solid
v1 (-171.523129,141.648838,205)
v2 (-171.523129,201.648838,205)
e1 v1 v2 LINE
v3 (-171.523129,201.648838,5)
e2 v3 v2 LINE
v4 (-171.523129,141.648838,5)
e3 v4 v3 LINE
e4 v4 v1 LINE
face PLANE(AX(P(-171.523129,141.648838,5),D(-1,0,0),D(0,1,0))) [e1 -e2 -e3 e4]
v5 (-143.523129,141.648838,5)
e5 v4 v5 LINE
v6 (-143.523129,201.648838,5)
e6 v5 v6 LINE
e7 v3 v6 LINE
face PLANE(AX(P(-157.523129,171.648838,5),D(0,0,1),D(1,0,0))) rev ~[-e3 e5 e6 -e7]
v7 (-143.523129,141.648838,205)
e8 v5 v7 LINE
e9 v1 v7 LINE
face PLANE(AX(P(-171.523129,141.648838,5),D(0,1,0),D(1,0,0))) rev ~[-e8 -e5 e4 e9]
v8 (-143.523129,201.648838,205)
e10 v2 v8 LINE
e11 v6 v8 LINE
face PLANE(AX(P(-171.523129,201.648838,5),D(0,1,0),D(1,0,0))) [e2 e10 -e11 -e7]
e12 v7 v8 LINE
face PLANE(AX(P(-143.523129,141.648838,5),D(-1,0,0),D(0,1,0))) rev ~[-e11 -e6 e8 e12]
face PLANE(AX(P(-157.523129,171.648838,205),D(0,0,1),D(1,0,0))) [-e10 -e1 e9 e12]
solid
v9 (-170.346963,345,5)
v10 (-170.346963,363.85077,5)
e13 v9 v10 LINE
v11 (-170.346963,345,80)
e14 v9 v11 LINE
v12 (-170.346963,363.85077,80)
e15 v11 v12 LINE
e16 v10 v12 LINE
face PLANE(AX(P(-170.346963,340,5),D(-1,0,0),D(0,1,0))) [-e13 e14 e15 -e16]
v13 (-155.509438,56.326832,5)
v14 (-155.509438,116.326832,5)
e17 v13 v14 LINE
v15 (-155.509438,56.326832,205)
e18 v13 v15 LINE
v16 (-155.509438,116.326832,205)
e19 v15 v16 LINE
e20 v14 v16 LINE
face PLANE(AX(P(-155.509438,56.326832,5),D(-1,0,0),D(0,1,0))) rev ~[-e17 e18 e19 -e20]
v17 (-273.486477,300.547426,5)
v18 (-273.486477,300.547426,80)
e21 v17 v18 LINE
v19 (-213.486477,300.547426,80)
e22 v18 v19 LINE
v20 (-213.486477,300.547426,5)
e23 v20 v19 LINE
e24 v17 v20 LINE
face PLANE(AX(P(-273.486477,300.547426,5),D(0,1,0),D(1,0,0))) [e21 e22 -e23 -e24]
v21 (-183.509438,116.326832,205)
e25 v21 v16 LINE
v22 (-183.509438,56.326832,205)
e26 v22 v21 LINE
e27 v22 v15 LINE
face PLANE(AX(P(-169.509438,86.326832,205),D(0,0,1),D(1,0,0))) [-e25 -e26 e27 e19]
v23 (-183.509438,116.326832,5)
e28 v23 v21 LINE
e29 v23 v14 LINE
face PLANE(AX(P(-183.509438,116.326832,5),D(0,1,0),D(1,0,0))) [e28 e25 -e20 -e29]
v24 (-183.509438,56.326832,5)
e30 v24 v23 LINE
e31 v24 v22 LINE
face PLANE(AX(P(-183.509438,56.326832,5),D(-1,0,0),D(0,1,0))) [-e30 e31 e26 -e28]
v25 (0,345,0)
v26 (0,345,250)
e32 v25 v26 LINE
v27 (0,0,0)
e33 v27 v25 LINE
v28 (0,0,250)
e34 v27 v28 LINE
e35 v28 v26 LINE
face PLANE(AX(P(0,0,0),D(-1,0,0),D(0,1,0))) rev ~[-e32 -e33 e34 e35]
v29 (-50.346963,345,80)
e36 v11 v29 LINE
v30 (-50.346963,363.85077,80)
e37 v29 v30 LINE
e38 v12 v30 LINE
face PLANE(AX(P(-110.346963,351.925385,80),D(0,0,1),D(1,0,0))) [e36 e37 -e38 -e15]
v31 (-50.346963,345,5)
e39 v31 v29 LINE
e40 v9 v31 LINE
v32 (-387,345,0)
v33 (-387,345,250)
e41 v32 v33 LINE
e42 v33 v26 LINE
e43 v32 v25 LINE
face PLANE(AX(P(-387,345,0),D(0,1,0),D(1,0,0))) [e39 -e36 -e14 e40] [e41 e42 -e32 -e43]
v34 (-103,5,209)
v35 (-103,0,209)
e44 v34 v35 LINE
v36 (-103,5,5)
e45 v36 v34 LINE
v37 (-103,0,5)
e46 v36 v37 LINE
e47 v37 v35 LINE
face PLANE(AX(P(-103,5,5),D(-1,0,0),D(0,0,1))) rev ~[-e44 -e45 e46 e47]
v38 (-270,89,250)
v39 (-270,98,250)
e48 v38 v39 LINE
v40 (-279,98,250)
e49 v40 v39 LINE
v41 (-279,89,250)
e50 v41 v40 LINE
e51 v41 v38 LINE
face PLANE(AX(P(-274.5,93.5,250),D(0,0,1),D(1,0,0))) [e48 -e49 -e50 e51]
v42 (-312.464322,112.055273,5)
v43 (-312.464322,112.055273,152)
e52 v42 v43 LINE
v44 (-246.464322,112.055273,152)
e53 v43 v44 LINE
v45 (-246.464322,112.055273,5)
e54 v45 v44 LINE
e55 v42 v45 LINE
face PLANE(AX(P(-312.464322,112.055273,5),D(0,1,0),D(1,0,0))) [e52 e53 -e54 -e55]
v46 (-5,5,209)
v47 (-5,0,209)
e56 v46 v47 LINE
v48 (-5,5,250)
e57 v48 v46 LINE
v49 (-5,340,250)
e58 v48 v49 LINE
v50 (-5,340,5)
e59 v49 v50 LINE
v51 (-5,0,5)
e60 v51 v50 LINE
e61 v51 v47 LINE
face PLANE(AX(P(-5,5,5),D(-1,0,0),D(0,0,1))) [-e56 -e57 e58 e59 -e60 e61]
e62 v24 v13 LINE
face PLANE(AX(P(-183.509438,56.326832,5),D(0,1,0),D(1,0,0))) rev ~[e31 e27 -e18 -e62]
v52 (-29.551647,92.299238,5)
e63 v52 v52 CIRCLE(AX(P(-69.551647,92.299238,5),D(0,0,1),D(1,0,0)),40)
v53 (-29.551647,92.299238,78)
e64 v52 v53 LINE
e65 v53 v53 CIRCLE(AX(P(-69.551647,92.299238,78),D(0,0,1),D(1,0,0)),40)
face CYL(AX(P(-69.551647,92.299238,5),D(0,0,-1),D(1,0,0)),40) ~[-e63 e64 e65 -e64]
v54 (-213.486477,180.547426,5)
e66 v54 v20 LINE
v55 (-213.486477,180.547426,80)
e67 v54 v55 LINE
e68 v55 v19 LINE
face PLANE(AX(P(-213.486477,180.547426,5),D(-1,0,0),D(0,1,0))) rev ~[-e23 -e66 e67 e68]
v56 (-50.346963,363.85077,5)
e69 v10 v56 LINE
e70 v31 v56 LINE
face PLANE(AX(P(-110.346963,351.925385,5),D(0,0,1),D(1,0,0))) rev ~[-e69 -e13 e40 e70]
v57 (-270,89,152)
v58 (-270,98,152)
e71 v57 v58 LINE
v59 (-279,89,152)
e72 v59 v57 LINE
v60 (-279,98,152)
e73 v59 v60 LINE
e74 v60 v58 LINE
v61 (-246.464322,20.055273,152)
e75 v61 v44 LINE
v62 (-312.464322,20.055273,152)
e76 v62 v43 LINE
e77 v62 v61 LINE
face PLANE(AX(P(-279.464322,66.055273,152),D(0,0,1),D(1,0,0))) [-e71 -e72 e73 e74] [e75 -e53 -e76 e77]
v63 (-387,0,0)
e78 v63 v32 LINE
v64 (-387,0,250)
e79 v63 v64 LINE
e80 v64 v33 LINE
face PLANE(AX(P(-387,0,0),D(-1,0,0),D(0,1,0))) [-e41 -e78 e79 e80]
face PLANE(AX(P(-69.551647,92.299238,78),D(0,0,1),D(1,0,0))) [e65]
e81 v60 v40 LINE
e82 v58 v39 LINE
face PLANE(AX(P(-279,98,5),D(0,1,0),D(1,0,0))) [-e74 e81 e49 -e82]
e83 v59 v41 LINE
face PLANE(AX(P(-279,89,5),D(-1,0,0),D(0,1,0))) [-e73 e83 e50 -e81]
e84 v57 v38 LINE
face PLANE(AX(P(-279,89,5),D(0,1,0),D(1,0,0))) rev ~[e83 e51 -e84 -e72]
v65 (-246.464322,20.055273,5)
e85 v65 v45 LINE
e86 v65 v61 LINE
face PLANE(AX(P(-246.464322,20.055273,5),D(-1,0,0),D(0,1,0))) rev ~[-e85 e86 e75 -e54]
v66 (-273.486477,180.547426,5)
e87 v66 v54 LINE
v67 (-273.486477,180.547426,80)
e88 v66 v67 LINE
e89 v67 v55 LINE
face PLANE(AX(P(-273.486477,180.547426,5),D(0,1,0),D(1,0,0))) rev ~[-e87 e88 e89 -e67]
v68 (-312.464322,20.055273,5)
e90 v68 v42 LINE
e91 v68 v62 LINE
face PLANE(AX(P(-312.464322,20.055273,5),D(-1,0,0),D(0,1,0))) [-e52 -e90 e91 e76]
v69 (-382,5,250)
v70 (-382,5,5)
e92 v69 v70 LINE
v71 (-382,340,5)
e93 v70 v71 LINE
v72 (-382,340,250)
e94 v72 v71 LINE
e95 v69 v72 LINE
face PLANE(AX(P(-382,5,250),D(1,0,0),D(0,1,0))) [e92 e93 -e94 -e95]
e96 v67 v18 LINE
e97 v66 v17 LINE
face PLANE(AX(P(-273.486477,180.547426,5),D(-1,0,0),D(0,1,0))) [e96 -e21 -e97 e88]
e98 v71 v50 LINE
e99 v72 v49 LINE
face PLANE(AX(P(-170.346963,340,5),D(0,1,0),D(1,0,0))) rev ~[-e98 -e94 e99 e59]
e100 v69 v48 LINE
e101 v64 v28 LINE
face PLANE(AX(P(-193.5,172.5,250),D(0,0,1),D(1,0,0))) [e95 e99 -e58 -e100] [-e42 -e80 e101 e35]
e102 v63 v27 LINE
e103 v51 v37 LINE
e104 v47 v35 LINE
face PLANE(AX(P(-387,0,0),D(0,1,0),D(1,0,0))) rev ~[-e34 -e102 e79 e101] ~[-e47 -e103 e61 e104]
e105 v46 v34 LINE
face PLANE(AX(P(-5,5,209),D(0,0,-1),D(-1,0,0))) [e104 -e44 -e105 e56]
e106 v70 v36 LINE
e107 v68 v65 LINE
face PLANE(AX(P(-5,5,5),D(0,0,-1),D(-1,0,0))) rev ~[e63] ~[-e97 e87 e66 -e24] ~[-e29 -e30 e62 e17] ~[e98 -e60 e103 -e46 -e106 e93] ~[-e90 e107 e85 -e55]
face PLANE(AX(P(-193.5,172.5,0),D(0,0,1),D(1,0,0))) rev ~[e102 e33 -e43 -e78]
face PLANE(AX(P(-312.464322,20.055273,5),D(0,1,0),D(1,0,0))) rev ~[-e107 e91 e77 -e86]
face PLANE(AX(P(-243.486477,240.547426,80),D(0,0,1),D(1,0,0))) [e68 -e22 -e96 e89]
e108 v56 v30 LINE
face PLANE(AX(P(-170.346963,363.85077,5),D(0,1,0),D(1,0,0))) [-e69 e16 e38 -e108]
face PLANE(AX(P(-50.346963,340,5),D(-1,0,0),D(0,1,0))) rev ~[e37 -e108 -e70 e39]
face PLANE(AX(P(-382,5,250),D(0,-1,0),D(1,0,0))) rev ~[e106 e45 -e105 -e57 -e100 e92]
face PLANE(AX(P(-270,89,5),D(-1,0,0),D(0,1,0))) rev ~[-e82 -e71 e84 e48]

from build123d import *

# Parameters (mm, degrees)
F0_W      = 387
F0_H      = 345
F1_DEPTH  = 250
F2_W      = 377
F2_H      = 335
F3_DEPTH  = 245
F4_W      = 98
F4_H      = 204
F5_DEPTH  = 25
F6_W      = 9
F6_H      = 9
F7_DEPTH  = 245
F8_W      = 60
F8_H      = 120
F9_DEPTH  = 75
F10_W     = 120
F10_H     = 23.8507700859
F11_DEPTH = 75
F12_W     = 28
F12_H     = 60
F13_DEPTH = 200
F14_W     = 28
F14_H     = 60
F15_DEPTH = 200
F16_R     = 40
F17_DEPTH = 73
F18_W     = 66
F18_H     = 92
F18_W_2   = 9
F18_H_2   = 9
F19_DEPTH = 147


with BuildPart() as f1:
    # F0 (on Top) → F1 (new body)
    with BuildSketch(Plane.XY):
        with Locations((-193.5, 172.5)):
            Rectangle(F0_W, F0_H)
    extrude(amount=F1_DEPTH)

    # F2 (on face) → F3 (cut)
    with BuildSketch(Plane.XY.offset(250)):
        with Locations((-193.5, 172.5)):
            Rectangle(F2_W, F2_H)
    extrude(amount=-F3_DEPTH, mode=Mode.SUBTRACT)

    # F4 (on face) → F5 (cut)
    with BuildSketch(Plane(origin=(0, 5, 0), x_dir=(-1, 0, 0), z_dir=(0, 1, 0))):
        with Locations((54, 107)):
            Rectangle(F4_W, F4_H)
    extrude(amount=-F5_DEPTH, mode=Mode.SUBTRACT)

    # F6 (on face) → F7 (join)
    with BuildSketch(Plane.XY.offset(5)):
        with Locations((-274.5, 93.5)):
            Rectangle(F6_W, F6_H)
    extrude(amount=F7_DEPTH)

    # F8 (on face) → F9 (join)
    with BuildSketch(Plane.XY.offset(5)):
        with Locations((-243.4864774462, 240.5474260449)):
            Rectangle(F8_W, F8_H)
    extrude(amount=F9_DEPTH)

    # F10 (on face) → F11 (join)
    with BuildSketch(Plane.XY.offset(5)):
        with Locations((-110.3469633506, 351.925385043)):
            Rectangle(F10_W, F10_H)
    extrude(amount=F11_DEPTH)

    # F14 (on face) → F15 (join)
    with BuildSketch(Plane.XY.offset(5)):
        with Locations((-169.5094383758, 86.3268319517)):
            Rectangle(F14_W, F14_H)
    extrude(amount=F15_DEPTH)

    # F16 (on face) → F17 (join)
    with BuildSketch(Plane.XY.offset(5)):
        with Locations((-69.5516467094, 92.2992378473)):
            Circle(F16_R)
    extrude(amount=F17_DEPTH)

    # F18 (on face) → F19 (join)
    with BuildSketch(Plane.XY.offset(5)):
        with Locations((-279.4643215769, 66.0552727059)):
            Rectangle(F18_W, F18_H)
        with Locations((-274.5, 93.5)):
            Rectangle(F18_W_2, F18_H_2, mode=Mode.SUBTRACT)
    extrude(amount=F19_DEPTH)


with BuildPart() as f13:
    # F12 (on face) → F13 (new body)
    with BuildSketch(Plane.XY.offset(5)):
        with Locations((-157.5231286956, 171.648837626)):
            Rectangle(F12_W, F12_H)
    extrude(amount=F13_DEPTH)


solid = Compound([f1.part, f13.part])
